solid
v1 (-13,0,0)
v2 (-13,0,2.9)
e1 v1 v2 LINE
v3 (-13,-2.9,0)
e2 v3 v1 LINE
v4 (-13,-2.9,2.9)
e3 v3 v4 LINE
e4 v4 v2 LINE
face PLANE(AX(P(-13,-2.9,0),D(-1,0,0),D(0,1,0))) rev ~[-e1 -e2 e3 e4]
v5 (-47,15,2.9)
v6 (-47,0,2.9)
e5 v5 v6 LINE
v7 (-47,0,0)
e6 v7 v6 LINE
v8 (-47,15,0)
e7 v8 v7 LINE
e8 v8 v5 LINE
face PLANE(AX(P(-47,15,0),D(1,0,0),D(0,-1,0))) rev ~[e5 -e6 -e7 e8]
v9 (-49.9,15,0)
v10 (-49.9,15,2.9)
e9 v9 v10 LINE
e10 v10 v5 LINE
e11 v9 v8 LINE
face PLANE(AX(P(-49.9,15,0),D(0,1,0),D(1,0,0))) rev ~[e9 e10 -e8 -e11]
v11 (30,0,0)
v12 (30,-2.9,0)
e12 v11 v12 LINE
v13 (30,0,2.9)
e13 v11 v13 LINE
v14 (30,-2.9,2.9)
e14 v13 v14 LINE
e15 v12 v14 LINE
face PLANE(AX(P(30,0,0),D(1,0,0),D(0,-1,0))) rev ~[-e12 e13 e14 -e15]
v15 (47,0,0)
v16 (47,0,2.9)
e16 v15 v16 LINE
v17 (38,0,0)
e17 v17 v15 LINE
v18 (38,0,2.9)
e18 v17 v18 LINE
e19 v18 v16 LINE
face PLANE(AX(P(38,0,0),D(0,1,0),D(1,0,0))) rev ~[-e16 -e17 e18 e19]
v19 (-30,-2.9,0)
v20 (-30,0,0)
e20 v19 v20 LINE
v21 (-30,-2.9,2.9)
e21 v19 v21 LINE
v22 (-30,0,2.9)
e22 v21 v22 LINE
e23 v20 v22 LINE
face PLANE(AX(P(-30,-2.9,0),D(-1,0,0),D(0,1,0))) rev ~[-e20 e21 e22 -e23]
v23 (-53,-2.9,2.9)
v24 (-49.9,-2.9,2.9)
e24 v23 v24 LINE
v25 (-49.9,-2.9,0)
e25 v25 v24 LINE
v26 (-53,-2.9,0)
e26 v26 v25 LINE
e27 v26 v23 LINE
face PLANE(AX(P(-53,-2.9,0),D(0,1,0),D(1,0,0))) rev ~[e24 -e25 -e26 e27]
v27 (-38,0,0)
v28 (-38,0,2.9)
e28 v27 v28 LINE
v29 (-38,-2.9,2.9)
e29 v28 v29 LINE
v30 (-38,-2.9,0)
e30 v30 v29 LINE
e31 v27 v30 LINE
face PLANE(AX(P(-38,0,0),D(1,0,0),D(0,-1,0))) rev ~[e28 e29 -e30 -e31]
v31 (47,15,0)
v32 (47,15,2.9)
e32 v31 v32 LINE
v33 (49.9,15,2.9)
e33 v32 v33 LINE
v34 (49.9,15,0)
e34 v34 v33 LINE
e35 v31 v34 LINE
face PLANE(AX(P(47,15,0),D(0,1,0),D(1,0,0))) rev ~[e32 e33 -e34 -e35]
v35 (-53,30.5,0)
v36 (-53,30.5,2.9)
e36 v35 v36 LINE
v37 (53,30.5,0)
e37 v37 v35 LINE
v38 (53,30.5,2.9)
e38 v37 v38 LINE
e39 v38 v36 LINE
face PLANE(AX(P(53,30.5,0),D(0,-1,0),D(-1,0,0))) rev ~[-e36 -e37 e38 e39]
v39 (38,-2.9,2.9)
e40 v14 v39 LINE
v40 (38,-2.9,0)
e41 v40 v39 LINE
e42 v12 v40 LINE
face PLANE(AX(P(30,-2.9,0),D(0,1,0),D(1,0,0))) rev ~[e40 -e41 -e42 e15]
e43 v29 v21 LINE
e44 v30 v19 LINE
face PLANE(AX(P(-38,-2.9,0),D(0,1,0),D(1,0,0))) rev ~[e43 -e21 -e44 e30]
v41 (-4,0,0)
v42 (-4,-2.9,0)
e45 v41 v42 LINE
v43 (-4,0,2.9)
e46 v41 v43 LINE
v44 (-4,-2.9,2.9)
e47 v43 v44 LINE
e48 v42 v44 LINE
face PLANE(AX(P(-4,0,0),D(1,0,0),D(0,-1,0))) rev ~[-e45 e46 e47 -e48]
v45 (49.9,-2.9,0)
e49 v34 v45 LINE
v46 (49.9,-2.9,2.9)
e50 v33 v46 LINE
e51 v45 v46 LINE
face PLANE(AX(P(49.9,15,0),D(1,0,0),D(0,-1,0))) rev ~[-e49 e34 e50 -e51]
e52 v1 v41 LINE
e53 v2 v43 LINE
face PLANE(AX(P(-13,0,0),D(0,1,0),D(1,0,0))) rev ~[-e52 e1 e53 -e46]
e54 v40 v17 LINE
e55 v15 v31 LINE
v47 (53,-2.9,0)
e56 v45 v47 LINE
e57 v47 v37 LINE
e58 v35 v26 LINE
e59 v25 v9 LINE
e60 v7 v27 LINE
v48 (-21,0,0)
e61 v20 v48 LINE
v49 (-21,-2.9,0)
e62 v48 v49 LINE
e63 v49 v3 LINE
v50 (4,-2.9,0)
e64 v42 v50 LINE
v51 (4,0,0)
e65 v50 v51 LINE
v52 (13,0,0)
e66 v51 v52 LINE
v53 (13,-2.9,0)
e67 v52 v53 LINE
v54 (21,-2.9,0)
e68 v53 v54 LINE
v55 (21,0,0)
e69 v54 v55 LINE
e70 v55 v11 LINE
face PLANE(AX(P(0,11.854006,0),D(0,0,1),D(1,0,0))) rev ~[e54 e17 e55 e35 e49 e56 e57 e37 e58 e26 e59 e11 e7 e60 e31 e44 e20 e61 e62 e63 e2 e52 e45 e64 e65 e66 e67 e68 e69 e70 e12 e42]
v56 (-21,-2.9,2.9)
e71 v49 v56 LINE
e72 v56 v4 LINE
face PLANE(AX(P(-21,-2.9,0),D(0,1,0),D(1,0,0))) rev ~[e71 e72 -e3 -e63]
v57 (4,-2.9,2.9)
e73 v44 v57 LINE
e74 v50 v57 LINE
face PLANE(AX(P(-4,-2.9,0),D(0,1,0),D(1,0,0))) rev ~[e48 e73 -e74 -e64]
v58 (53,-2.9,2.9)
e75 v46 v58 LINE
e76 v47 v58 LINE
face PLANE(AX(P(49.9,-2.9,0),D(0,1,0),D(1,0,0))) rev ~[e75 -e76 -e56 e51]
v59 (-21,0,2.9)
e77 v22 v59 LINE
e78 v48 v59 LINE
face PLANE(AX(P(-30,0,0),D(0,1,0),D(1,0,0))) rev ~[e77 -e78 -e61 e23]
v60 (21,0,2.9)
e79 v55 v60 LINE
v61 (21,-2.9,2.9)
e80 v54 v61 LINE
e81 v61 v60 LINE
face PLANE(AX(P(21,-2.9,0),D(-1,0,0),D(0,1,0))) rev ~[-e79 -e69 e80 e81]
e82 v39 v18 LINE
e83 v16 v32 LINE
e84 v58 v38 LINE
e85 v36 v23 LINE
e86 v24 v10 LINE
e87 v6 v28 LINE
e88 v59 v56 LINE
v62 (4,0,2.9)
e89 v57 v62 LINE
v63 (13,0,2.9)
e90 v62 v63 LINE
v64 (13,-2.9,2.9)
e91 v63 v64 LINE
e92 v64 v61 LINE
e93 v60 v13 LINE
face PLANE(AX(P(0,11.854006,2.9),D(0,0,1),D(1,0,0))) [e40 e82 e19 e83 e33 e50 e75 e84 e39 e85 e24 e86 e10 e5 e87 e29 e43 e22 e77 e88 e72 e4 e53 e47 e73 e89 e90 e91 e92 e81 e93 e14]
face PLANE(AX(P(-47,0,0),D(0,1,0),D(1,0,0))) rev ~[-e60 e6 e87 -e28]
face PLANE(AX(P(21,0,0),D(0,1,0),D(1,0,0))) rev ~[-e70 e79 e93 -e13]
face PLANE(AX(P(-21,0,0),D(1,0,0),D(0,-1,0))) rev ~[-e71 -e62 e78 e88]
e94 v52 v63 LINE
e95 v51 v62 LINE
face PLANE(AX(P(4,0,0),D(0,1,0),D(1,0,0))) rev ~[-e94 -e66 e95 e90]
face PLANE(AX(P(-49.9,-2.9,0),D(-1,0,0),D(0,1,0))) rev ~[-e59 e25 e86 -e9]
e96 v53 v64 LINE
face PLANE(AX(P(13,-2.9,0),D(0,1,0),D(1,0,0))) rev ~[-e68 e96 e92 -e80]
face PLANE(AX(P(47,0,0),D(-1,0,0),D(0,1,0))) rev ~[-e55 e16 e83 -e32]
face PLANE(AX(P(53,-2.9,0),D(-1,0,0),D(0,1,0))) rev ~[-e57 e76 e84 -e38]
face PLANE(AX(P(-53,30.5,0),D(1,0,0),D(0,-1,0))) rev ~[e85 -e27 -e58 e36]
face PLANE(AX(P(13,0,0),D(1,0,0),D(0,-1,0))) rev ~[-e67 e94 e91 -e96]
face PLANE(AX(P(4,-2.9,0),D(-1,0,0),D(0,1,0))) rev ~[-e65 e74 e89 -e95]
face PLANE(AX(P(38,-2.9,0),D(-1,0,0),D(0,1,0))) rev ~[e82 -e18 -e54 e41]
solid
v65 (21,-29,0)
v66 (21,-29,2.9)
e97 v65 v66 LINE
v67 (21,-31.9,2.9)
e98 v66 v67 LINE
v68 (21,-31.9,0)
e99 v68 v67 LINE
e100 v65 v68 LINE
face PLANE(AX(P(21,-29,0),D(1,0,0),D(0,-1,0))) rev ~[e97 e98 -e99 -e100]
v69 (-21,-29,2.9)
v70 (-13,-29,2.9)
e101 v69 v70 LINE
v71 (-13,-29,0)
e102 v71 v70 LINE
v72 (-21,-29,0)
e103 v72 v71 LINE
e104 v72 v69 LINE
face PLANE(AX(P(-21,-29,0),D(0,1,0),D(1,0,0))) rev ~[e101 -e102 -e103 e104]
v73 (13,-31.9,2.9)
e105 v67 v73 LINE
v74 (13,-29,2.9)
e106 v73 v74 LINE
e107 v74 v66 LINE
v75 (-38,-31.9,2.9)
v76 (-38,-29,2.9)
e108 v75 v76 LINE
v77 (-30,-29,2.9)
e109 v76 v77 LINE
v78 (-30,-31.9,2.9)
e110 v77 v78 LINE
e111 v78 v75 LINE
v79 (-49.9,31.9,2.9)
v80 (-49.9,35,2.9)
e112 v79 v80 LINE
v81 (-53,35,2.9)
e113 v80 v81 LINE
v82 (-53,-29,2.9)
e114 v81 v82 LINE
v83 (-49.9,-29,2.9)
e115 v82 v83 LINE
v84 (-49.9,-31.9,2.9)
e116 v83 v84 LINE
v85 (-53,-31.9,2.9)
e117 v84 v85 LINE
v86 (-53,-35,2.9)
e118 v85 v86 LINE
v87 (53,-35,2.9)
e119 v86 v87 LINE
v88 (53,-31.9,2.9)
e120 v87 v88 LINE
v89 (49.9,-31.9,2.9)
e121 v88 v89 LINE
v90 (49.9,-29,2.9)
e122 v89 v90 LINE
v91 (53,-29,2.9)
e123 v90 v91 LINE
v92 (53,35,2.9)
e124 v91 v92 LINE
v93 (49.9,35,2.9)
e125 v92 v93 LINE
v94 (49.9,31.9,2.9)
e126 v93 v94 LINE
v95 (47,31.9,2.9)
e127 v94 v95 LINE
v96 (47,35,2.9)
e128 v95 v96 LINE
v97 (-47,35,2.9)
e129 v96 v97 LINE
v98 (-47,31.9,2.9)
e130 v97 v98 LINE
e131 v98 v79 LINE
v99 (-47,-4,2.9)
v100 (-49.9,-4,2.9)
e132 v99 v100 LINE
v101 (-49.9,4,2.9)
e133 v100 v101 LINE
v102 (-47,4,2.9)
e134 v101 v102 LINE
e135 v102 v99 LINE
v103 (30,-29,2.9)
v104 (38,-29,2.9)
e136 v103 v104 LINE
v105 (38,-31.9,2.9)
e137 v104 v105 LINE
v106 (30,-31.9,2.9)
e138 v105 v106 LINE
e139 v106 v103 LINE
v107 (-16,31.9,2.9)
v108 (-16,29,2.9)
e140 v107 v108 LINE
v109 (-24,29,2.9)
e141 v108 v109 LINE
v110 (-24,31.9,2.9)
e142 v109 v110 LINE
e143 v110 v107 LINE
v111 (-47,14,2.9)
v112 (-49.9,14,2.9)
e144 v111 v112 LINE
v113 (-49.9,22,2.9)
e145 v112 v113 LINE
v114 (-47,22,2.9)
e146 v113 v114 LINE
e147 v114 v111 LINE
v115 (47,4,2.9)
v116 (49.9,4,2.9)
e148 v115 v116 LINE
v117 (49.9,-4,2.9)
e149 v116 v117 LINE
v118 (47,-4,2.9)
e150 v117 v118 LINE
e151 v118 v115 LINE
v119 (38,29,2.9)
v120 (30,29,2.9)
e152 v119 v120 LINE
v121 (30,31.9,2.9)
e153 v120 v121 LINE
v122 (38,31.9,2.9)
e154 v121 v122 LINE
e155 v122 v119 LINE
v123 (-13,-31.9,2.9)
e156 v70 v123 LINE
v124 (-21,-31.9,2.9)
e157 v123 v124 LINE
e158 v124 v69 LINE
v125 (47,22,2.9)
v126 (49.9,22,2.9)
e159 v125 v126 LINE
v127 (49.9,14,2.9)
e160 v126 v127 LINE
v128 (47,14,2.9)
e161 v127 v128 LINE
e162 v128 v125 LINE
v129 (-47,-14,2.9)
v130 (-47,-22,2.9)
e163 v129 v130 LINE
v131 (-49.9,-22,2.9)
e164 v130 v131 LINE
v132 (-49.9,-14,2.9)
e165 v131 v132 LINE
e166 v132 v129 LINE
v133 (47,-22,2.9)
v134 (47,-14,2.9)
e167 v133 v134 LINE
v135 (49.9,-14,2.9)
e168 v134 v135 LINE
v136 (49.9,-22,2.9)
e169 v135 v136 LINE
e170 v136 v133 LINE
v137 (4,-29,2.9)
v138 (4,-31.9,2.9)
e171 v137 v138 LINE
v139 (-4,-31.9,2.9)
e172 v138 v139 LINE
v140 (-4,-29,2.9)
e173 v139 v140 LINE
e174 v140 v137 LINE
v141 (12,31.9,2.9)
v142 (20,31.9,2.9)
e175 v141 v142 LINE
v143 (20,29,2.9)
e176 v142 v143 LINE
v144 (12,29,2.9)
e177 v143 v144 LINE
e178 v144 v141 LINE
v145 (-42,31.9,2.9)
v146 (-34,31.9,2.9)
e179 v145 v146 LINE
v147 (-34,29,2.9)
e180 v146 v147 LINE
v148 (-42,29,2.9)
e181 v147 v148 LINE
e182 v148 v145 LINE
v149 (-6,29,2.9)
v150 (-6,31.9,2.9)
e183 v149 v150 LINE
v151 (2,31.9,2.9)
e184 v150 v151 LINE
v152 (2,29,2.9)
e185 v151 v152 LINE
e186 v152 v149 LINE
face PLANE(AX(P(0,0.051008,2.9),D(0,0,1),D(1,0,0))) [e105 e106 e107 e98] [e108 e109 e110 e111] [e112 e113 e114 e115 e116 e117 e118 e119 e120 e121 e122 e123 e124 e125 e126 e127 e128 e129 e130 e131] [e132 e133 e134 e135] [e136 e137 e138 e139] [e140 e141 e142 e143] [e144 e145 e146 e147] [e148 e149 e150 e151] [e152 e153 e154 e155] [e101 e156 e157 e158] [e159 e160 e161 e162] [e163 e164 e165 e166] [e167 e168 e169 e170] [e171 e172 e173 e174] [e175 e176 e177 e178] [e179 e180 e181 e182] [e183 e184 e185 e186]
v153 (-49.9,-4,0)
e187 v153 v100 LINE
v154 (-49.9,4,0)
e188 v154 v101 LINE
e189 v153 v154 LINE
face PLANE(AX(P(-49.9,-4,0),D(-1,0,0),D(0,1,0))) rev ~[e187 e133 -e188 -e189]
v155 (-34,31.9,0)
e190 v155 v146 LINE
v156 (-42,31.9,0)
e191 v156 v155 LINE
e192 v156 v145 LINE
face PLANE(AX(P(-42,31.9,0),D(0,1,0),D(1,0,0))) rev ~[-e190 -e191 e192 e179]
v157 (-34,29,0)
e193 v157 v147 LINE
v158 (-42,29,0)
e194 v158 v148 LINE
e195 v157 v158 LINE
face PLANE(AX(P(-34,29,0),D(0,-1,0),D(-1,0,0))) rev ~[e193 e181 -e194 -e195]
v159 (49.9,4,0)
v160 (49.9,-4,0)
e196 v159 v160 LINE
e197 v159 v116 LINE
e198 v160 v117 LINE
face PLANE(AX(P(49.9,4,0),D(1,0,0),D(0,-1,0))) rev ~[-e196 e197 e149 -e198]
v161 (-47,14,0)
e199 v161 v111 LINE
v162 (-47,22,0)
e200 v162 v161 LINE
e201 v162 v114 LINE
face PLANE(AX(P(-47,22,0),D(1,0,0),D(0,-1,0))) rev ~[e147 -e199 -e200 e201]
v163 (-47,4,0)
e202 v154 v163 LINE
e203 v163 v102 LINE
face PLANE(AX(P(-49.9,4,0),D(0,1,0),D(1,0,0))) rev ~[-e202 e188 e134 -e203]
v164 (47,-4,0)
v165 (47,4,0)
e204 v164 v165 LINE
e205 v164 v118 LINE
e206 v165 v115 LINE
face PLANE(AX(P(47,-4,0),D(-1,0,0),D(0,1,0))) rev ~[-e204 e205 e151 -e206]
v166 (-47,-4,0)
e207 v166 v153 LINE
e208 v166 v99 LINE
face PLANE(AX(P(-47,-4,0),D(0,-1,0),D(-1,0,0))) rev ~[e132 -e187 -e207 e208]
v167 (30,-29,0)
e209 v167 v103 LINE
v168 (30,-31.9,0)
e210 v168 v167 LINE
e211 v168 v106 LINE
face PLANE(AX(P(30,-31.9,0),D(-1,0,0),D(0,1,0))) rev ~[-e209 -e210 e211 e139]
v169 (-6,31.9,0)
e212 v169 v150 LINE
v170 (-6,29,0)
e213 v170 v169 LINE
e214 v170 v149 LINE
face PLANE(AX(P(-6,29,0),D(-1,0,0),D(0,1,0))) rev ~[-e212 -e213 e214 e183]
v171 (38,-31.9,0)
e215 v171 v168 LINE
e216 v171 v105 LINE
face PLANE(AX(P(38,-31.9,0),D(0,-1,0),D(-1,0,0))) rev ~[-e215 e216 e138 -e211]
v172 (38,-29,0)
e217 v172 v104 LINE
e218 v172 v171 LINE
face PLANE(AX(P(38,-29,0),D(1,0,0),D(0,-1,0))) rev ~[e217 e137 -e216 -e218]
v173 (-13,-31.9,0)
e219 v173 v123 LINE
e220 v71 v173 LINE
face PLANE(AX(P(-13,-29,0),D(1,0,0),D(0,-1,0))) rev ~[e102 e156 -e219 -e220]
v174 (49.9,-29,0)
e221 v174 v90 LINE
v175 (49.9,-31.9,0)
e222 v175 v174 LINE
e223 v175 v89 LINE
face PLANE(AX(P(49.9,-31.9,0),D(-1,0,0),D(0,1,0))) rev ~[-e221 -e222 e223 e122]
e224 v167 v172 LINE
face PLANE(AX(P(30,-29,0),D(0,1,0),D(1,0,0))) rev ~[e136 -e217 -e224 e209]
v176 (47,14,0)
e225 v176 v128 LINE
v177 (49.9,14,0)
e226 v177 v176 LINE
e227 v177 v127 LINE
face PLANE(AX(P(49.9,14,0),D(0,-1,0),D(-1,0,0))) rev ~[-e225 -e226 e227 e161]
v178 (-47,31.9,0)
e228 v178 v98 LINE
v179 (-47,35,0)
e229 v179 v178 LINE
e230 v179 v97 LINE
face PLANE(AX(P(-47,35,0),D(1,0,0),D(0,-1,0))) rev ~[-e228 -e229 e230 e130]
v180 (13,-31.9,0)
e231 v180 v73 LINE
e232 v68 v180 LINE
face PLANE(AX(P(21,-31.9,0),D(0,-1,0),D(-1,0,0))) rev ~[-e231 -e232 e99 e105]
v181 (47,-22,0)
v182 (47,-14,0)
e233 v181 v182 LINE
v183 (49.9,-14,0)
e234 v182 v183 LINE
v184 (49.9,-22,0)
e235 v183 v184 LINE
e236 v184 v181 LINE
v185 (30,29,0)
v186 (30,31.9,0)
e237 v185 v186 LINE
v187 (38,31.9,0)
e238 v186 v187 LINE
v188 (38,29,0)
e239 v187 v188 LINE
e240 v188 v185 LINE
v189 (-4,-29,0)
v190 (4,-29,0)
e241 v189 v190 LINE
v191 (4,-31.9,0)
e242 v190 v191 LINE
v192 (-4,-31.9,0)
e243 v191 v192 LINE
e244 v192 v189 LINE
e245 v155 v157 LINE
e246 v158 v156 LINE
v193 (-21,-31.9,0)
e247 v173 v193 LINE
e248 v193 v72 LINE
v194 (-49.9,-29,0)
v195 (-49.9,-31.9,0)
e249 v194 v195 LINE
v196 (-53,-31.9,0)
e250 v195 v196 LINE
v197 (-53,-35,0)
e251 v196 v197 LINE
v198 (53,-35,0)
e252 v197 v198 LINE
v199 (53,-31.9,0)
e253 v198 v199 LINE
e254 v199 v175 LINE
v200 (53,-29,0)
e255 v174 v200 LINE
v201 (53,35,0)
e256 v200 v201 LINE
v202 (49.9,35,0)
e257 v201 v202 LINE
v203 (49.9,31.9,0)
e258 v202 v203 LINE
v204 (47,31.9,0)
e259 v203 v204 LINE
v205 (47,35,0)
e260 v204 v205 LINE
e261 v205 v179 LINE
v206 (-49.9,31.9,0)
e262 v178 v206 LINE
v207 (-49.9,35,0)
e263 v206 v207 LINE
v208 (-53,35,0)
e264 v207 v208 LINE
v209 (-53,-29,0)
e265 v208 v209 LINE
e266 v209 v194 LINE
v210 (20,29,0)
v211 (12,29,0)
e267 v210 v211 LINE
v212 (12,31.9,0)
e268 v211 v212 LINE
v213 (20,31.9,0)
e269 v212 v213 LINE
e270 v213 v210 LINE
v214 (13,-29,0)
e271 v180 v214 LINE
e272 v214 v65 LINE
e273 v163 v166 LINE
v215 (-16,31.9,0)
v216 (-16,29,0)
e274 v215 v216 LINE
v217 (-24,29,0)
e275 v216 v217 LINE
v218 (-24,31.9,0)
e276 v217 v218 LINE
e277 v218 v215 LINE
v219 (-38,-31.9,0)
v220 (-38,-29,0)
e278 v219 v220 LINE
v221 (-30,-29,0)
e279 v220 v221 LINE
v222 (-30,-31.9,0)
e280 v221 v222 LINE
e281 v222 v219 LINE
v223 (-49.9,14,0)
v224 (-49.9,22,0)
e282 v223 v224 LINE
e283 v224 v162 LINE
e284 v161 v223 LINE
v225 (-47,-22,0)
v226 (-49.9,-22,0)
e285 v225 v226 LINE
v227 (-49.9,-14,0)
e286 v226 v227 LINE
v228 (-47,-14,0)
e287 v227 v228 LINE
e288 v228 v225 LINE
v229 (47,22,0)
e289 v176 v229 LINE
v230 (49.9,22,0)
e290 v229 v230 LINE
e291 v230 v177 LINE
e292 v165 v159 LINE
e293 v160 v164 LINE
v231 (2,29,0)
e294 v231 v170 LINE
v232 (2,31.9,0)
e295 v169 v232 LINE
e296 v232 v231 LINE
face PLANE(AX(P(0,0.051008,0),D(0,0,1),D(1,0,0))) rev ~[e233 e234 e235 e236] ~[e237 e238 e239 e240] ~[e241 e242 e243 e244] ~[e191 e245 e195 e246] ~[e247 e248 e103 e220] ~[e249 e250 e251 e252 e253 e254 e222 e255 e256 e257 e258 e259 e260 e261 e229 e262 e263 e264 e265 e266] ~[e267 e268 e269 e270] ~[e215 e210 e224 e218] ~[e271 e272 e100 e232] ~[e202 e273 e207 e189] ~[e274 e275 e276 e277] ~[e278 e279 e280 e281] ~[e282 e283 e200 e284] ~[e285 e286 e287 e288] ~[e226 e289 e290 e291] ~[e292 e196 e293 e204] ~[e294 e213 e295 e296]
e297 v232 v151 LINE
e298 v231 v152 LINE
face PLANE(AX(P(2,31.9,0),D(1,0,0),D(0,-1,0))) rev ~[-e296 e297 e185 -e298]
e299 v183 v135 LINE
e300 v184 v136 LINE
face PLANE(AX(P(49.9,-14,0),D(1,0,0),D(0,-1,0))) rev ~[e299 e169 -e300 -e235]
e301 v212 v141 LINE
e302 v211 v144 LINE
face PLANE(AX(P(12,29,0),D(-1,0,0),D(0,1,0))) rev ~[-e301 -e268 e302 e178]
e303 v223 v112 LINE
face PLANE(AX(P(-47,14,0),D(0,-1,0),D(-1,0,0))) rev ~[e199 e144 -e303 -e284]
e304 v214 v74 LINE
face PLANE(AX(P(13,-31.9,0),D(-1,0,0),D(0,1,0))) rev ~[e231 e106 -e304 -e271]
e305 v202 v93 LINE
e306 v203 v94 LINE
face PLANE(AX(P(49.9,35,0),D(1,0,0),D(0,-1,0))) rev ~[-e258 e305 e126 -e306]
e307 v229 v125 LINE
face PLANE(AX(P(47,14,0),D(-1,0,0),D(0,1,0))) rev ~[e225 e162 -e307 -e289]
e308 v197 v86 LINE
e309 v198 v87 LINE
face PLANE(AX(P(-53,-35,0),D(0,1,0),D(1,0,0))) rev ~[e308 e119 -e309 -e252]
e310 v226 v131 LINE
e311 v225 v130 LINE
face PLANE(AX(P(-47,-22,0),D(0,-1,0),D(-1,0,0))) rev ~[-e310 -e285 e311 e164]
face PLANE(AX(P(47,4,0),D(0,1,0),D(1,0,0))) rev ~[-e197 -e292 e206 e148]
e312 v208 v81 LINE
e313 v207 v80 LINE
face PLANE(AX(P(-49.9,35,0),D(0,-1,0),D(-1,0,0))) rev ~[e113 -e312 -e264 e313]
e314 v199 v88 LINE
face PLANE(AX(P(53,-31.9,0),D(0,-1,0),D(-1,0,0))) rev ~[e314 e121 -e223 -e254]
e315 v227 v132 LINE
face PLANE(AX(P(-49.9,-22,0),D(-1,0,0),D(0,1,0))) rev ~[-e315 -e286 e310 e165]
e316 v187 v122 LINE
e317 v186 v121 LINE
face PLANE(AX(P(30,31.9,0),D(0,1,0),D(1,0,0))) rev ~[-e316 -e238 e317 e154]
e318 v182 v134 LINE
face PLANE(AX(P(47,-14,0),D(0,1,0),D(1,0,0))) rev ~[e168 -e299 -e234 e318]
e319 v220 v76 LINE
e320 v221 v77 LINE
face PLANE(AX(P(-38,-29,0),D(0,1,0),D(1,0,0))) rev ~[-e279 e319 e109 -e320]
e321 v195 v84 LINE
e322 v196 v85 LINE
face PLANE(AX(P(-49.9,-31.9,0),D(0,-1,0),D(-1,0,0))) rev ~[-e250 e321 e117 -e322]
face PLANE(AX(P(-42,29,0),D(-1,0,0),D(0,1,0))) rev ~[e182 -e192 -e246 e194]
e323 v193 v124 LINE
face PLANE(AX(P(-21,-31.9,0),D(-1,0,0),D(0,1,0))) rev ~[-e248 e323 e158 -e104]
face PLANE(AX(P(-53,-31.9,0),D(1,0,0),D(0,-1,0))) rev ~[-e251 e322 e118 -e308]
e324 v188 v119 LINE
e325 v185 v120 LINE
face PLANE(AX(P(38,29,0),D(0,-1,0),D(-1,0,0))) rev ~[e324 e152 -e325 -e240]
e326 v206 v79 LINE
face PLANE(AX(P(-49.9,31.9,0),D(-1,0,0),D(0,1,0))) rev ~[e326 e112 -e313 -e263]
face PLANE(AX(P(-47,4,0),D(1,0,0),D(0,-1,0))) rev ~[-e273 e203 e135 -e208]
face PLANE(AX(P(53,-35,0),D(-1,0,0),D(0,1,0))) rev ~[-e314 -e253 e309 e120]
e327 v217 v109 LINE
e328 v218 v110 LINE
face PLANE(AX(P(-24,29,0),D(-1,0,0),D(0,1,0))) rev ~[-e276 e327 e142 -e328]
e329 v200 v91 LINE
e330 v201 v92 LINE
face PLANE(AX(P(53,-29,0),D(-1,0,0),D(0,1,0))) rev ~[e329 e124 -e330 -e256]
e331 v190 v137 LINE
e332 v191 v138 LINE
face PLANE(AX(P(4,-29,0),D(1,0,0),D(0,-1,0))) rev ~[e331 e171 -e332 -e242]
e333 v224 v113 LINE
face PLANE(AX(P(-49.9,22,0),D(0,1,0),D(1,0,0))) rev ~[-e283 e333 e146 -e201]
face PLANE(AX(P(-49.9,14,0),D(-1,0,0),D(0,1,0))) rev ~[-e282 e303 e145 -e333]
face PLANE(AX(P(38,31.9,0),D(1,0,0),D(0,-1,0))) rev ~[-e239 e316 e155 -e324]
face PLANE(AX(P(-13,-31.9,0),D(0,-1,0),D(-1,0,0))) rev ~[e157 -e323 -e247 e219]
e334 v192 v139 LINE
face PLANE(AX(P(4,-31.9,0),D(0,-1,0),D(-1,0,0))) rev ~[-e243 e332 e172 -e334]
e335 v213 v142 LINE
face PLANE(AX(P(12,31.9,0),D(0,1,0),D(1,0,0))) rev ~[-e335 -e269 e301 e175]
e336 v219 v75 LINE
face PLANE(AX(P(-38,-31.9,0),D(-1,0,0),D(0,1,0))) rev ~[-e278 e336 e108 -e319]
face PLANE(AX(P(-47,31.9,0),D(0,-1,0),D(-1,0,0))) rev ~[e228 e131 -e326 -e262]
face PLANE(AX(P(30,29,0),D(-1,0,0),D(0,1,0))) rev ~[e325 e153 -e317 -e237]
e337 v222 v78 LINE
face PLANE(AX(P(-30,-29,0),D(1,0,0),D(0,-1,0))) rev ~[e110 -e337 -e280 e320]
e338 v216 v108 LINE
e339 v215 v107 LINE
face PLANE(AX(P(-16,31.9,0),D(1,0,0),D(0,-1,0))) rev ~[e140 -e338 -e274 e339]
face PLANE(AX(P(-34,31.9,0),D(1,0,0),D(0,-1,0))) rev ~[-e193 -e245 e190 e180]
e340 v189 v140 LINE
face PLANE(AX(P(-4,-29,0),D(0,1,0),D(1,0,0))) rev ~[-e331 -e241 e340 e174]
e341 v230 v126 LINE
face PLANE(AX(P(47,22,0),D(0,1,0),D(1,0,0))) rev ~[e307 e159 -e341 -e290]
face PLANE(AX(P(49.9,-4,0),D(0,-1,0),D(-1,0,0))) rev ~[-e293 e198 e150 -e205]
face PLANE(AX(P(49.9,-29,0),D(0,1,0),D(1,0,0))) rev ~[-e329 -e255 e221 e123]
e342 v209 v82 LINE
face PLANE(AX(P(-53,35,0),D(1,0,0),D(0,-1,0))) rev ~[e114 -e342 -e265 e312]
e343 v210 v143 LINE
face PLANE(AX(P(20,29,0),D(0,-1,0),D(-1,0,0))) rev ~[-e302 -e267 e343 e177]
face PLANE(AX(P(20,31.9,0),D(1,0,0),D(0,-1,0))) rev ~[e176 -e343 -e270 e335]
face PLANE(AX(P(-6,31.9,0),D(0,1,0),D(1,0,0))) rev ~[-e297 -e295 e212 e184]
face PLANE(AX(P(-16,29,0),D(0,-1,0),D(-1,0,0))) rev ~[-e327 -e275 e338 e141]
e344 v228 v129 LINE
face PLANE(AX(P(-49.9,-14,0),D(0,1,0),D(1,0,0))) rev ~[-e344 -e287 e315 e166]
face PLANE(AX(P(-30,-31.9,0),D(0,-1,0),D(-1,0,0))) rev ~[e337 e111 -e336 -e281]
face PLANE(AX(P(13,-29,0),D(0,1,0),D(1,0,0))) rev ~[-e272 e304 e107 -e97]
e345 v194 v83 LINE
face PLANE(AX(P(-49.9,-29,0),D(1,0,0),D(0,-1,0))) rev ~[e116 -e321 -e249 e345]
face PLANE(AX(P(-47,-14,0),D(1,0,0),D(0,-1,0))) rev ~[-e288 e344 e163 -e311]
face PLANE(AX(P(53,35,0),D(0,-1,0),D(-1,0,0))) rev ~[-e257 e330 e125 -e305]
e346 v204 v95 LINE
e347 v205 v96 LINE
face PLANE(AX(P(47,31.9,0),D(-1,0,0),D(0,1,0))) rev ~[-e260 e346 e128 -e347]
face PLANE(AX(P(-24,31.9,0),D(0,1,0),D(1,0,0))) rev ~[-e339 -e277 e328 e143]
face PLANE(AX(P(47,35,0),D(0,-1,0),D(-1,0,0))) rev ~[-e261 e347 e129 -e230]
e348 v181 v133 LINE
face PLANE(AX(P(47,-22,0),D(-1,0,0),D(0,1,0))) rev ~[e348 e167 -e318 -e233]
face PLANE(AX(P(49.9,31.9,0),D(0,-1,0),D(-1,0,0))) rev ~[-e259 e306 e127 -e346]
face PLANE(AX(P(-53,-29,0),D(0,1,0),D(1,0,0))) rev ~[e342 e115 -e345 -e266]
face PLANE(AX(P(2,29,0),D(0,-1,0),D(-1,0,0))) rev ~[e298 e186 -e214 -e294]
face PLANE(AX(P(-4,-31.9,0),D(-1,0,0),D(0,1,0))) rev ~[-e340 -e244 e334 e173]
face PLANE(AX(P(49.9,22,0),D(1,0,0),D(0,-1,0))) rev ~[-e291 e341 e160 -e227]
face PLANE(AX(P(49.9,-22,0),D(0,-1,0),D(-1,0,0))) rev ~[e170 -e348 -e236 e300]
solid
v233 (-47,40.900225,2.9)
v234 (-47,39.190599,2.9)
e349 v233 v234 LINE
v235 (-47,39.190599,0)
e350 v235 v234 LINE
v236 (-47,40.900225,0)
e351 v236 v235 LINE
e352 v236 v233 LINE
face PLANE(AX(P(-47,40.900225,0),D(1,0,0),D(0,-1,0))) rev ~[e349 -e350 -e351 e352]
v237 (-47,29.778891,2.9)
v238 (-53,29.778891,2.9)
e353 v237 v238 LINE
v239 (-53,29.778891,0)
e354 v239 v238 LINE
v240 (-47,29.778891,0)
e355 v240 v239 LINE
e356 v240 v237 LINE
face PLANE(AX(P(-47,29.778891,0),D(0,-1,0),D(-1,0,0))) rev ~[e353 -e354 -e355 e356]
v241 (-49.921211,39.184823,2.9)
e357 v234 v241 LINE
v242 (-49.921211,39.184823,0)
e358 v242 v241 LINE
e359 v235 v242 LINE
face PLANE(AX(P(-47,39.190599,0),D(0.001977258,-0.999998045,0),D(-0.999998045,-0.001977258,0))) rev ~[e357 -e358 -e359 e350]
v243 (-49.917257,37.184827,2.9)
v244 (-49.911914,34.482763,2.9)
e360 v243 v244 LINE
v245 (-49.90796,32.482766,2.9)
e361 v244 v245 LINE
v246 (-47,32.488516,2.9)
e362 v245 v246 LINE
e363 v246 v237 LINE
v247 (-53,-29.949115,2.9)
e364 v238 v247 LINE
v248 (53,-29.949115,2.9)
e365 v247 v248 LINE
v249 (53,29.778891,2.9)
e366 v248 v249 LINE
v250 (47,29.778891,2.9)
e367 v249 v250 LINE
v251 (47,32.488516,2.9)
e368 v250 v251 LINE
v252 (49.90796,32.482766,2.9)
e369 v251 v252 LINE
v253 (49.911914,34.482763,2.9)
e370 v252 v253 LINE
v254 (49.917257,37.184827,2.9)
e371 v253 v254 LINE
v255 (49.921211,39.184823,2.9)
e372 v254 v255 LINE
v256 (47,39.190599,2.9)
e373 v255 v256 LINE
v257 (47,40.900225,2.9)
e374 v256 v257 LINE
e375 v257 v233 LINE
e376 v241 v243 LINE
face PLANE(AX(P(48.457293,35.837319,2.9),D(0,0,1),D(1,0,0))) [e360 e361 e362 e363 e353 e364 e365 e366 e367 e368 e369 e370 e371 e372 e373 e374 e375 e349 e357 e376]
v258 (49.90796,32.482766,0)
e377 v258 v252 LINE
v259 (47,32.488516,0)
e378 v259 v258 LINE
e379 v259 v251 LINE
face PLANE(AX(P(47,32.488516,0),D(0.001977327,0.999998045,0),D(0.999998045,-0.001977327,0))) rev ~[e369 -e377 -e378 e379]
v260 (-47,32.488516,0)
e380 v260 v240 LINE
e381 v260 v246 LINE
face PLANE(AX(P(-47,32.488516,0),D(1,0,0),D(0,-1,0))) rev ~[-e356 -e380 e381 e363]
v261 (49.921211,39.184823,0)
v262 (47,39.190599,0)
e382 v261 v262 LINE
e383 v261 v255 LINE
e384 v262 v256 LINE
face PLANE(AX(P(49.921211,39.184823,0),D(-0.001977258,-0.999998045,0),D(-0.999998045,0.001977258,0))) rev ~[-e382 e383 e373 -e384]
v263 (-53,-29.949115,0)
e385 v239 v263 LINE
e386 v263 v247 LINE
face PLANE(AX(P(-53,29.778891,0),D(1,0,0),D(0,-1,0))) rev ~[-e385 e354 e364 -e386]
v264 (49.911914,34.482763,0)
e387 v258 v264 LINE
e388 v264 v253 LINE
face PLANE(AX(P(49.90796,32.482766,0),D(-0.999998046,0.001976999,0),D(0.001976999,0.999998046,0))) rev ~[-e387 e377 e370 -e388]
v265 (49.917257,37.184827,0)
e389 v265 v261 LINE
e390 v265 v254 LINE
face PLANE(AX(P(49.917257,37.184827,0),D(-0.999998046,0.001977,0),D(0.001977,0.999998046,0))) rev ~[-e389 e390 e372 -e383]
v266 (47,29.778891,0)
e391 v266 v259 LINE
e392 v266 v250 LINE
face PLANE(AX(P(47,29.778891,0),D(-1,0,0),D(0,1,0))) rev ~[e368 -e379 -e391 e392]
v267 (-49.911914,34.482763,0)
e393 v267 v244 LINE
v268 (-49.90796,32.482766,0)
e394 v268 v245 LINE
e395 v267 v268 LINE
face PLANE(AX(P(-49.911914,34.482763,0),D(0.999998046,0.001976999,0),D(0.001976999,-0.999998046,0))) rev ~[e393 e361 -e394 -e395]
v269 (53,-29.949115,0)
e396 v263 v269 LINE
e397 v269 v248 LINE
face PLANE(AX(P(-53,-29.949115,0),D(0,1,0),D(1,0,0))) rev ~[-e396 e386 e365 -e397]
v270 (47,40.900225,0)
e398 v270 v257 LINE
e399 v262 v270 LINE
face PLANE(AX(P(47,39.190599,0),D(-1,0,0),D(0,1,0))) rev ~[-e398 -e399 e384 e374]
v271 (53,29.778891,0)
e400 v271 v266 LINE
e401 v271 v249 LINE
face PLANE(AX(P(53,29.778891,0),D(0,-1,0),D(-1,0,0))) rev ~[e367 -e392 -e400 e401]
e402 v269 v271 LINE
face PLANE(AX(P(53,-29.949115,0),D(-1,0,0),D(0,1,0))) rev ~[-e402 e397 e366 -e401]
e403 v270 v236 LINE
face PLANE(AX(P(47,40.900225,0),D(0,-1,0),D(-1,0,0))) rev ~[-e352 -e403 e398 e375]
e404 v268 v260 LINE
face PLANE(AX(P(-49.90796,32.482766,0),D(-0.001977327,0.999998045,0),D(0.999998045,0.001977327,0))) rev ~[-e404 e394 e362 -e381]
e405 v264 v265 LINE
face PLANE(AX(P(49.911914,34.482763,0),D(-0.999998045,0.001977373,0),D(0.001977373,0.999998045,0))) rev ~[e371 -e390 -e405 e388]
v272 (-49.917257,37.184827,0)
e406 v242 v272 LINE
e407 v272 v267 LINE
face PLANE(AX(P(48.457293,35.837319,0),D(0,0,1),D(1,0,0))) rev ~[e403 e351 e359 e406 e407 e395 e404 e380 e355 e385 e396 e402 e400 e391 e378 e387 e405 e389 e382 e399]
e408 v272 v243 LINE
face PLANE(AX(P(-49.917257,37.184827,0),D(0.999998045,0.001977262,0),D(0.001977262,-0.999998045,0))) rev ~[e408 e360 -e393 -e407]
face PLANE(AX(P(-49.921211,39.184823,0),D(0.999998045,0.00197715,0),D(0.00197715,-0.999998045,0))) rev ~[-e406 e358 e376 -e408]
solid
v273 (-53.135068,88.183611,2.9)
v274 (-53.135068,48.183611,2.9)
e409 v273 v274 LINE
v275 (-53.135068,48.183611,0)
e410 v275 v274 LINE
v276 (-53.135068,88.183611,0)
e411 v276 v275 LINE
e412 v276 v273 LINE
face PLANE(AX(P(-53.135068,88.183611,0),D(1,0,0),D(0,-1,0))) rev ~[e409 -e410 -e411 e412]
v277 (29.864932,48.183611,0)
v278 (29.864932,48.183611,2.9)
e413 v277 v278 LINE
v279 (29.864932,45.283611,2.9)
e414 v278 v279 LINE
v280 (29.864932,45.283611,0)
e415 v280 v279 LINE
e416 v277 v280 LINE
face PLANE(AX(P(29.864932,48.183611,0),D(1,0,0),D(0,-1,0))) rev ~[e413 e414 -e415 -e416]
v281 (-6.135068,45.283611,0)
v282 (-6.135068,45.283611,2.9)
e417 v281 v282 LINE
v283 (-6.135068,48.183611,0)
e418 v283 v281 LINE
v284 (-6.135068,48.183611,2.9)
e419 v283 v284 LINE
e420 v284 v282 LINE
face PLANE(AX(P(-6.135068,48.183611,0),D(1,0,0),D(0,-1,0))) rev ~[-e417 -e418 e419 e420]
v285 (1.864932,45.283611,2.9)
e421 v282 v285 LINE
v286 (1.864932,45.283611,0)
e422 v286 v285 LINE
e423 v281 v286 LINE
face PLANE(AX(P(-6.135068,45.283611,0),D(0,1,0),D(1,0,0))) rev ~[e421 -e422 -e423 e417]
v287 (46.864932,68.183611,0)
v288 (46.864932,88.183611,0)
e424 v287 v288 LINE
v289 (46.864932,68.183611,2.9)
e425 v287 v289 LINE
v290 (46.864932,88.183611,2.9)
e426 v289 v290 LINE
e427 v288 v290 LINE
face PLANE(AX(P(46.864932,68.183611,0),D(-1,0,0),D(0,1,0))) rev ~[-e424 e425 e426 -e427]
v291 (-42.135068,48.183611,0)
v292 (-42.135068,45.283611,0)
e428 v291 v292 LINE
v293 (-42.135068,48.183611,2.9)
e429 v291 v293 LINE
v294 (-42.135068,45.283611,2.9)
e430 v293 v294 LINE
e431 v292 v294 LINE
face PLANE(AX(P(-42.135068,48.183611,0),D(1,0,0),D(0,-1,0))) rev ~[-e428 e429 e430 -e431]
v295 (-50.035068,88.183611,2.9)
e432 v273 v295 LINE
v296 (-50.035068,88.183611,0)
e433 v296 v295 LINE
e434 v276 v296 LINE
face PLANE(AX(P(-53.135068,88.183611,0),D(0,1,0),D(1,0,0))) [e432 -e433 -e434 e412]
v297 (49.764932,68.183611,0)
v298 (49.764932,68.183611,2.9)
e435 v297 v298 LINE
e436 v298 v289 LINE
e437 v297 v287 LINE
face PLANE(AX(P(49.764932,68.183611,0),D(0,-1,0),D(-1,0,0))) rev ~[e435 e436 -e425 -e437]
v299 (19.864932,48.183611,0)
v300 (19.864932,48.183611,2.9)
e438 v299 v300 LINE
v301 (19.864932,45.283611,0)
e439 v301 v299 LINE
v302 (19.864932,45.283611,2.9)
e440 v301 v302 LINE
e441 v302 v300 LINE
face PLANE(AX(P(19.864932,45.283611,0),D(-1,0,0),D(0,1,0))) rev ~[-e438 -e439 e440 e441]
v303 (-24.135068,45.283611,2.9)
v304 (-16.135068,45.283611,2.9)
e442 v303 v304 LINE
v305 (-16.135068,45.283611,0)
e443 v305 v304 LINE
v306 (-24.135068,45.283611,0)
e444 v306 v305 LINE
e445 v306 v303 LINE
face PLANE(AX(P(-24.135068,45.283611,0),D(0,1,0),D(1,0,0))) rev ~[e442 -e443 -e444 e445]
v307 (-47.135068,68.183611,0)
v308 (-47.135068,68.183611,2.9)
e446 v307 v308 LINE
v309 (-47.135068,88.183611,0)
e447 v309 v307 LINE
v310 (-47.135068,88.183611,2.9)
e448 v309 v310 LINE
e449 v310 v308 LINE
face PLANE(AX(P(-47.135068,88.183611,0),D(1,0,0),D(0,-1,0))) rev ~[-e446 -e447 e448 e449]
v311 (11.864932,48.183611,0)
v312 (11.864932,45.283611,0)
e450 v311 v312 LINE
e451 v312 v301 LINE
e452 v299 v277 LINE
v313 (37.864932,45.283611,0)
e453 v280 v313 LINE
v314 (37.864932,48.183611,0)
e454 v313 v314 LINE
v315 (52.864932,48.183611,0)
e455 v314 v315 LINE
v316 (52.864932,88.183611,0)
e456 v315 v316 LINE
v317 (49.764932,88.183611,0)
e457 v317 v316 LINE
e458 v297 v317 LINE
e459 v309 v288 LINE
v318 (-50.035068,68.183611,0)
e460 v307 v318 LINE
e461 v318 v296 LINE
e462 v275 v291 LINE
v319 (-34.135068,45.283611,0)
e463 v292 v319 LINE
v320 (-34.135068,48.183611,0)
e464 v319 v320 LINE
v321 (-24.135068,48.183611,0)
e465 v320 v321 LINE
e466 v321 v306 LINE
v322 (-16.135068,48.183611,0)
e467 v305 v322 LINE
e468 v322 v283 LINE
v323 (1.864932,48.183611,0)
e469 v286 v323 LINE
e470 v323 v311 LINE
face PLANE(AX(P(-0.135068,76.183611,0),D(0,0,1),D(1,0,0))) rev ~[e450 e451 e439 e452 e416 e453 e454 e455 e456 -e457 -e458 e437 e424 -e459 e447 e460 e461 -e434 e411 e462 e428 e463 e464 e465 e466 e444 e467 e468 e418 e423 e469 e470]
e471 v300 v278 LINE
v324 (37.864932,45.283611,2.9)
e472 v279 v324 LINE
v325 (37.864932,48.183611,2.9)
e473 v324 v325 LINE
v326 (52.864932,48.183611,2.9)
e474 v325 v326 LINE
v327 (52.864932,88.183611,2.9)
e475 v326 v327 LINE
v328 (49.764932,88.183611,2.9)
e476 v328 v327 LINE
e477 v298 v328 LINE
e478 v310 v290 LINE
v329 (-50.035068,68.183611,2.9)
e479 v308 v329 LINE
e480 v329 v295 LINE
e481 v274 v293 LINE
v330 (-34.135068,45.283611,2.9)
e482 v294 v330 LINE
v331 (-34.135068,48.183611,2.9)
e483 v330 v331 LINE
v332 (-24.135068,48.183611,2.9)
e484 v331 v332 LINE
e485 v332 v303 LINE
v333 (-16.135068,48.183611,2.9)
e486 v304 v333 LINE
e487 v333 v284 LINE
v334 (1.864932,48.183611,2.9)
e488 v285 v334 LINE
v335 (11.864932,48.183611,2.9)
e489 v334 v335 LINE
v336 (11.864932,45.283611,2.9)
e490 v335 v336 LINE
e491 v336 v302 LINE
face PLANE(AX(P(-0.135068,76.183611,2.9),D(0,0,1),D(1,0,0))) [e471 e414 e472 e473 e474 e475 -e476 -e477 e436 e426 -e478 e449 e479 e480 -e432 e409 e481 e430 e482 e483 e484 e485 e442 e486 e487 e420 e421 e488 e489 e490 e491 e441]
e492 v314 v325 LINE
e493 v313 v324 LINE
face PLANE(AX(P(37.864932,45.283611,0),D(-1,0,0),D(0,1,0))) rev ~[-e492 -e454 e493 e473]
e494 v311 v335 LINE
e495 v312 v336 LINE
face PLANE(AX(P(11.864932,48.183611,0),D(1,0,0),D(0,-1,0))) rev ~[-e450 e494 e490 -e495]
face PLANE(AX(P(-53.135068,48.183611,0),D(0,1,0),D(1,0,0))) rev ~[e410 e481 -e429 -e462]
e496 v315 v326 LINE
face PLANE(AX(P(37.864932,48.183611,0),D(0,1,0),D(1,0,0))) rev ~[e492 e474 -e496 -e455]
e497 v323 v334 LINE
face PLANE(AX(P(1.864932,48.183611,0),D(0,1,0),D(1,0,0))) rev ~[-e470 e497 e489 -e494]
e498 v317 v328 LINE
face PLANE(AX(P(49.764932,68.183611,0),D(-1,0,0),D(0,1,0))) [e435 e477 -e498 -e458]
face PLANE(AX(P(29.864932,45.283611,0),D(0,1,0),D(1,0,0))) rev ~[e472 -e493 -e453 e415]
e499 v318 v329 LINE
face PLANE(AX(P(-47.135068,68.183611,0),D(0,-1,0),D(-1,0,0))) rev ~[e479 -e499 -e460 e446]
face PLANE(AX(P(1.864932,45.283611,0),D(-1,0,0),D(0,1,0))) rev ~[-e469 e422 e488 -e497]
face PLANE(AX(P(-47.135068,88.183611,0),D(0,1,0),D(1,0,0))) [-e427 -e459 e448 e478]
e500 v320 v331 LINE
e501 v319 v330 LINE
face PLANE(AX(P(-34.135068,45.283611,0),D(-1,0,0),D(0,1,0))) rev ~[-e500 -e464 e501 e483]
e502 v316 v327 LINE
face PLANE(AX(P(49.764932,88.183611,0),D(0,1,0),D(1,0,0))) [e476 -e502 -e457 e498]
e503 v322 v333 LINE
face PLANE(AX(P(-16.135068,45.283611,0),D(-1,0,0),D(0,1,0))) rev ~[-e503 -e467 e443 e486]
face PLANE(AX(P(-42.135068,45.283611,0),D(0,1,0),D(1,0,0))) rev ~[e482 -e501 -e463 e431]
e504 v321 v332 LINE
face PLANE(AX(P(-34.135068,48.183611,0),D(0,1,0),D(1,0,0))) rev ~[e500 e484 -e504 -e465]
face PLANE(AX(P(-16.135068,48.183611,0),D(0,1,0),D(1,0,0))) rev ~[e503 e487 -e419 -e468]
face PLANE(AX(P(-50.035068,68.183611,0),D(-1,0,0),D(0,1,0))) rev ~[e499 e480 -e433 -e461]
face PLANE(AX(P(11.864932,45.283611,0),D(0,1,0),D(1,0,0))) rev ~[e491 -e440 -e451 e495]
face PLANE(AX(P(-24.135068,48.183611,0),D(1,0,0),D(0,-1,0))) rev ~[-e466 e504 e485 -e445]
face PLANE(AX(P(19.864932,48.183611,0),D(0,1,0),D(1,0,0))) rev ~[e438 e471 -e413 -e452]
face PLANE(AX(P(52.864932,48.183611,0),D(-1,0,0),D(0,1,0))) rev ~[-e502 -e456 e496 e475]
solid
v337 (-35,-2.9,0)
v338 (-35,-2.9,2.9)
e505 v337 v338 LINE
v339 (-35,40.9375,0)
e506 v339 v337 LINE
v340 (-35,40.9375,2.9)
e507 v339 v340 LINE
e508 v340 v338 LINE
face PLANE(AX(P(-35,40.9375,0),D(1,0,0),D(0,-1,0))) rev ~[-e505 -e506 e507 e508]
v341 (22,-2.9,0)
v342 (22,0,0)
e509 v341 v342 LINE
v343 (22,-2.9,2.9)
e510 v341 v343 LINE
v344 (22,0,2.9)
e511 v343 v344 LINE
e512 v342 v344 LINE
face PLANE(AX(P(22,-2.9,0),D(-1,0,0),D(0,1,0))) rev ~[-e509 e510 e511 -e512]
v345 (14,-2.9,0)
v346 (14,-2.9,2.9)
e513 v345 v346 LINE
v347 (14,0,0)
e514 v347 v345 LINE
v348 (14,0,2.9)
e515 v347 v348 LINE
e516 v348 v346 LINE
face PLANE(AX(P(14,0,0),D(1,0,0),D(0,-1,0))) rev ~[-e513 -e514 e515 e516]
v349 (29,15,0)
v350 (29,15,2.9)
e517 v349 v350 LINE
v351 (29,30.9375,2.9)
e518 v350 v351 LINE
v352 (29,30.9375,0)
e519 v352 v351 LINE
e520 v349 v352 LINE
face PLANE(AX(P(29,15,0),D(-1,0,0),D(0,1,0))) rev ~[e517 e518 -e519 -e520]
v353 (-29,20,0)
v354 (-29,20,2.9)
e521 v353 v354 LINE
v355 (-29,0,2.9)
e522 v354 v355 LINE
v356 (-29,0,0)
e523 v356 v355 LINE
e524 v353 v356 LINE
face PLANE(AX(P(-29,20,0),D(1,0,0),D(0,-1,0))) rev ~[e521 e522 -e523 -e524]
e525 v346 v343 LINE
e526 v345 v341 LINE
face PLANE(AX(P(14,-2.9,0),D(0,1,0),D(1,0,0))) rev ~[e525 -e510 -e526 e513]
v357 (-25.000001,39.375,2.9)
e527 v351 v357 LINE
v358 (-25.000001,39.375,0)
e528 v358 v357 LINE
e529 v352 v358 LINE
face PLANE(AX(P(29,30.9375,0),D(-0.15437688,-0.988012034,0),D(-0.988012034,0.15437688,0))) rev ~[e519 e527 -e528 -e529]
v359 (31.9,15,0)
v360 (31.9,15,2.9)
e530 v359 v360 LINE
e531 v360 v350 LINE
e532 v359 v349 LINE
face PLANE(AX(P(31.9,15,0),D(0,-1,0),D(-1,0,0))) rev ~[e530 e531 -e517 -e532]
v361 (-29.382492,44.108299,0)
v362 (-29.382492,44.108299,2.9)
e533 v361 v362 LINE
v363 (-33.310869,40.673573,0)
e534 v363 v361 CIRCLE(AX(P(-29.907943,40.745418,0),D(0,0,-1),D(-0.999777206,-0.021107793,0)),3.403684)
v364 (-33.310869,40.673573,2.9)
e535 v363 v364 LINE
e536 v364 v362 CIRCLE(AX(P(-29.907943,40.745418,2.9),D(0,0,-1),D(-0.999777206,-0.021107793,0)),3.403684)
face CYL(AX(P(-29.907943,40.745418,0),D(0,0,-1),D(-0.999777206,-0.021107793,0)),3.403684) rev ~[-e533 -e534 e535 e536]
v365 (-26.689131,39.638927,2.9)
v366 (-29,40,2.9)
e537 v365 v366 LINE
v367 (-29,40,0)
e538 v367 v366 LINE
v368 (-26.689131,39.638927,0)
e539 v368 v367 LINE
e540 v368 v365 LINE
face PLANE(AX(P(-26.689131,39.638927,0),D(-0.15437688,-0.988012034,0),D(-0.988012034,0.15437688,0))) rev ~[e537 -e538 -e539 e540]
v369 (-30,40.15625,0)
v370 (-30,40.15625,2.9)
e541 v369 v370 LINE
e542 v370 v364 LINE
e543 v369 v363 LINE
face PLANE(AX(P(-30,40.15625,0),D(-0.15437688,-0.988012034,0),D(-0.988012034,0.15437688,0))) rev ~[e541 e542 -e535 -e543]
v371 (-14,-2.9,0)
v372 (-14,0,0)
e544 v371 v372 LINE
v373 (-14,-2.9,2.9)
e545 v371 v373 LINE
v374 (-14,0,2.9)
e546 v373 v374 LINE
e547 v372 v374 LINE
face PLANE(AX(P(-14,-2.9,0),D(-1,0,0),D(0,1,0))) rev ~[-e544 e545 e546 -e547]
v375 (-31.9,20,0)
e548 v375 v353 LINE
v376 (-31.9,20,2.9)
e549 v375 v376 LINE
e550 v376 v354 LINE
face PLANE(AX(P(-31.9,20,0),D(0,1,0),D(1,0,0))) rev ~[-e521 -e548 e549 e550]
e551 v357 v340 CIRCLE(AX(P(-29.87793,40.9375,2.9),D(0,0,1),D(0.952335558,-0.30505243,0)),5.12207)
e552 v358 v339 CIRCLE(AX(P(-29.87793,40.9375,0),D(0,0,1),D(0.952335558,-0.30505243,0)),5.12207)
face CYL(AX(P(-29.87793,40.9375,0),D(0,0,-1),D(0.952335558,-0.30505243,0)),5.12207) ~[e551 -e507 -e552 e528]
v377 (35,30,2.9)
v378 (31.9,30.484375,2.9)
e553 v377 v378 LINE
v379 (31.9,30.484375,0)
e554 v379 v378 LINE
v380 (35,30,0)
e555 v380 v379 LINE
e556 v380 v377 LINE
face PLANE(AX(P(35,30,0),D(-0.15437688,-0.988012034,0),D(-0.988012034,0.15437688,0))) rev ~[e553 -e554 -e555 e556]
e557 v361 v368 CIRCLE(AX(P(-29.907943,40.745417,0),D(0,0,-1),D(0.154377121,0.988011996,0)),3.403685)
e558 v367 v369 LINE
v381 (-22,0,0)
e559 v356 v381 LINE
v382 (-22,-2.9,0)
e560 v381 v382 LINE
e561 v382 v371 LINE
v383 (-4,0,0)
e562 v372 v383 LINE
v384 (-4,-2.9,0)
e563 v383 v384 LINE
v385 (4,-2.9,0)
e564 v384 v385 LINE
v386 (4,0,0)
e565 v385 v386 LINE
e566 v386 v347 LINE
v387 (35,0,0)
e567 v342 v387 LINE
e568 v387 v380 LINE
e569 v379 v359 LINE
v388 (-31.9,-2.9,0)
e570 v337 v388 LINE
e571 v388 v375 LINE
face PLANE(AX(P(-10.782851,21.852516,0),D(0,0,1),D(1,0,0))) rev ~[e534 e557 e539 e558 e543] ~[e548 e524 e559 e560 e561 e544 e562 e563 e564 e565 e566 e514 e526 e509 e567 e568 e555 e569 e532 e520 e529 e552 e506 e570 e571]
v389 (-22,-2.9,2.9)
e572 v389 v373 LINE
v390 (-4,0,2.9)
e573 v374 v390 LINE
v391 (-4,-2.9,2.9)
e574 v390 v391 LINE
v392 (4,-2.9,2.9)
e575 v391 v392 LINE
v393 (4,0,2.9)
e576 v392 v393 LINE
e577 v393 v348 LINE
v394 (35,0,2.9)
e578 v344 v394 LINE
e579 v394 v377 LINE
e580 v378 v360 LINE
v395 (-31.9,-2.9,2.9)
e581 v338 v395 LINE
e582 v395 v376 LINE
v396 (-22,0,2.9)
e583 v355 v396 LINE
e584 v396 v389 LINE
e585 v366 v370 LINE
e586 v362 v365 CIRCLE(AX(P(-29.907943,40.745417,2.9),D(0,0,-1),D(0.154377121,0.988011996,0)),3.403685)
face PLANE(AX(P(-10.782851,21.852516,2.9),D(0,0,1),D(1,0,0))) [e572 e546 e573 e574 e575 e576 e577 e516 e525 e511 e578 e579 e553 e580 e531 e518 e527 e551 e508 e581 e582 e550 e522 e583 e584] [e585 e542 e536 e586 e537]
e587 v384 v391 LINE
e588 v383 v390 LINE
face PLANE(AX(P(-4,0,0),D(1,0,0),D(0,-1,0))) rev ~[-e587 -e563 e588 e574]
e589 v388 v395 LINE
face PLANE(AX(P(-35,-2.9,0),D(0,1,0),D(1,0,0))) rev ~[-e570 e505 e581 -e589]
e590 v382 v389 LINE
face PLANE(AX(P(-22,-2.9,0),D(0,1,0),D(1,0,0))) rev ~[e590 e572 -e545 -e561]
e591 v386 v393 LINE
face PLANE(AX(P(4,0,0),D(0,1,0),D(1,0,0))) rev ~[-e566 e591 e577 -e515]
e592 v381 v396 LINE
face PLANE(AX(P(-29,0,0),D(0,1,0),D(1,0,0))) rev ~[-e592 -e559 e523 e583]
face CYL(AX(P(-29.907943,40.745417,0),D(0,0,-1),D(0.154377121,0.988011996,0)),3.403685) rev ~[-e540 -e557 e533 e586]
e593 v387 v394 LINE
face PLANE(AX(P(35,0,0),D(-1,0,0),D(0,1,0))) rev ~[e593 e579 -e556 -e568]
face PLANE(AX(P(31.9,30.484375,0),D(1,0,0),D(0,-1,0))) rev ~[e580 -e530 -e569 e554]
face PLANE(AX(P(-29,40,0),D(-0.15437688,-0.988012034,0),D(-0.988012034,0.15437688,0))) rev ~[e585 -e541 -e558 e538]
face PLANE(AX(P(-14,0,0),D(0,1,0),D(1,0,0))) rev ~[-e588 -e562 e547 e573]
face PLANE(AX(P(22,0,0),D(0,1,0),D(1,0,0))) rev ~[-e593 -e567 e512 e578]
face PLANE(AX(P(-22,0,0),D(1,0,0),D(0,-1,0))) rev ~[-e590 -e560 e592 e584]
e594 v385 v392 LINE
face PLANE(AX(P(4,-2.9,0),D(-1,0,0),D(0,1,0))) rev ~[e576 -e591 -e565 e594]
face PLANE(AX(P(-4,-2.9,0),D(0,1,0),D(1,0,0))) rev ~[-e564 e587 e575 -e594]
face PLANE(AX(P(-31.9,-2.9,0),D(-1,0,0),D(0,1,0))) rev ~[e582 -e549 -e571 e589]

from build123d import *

# Parameters (mm, degrees)
F2_DEPTH  = 2.9
F3_W      = 94
F3_H      = 16
F3_H_2    = 4
F3_W_2    = 3.1
F3_H_3    = 20
F4_DEPTH  = 2.9
F6_DEPTH  = 2.9
F8_DEPTH  = 2.9
F9_W      = 94
F9_H      = 1
F10_DEPTH = 2.9


# Not quite as in the source:
# - ends of sketch curves that miss each other by under 0.0002 mm in the source are joined


with BuildPart() as f2:
    # F1 (on Top) → F2 (new body)
    with BuildSketch(Plane.XY):
        Polygon((-53, -31.9), (-53, -35), (53, -35), (53, -31.9), (49.9, -31.9), (49.9, -29), (53, -29), (53, 35), (49.9, 35), (49.9, 31.9), (47, 31.9), (47, 35), (-47, 35), (-47, 31.9), (-49.9, 31.9), (-49.9, 35), (-53, 35), (-53, -29), (-49.9, -29), (-49.9, -31.9), align=None)
        Polygon((38, 29), (47, 29), (47, 22), (49.9, 22), (49.9, 14), (47, 14), (47, 4), (49.9, 4), (49.9, -4), (47, -4), (47, -14), (49.9, -14), (49.9, -22), (47, -22), (47, -29), (38, -29), (38, -31.9), (30, -31.9), (30, -29), (21, -29), (21, -31.9), (13, -31.9), (13, -29), (4, -29), (4, -31.9), (-4, -31.9), (-4, -29), (-13, -29), (-13, -31.9), (-21, -31.9), (-21, -29), (-30, -29), (-30, -31.9), (-38, -31.9), (-38, -29), (-47, -29), (-47, -22), (-49.9, -22), (-49.9, -14), (-47, -14), (-47, -4), (-49.9, -4), (-49.9, 4), (-47, 4), (-47, 14), (-49.9, 14), (-49.9, 22), (-47, 22), (-47, 29), (-42, 29), (-42, 31.9), (-34, 31.9), (-34, 29), (-24, 29), (-24, 31.9), (-16, 31.9), (-16, 29), (-6, 29), (-6, 31.9), (2, 31.9), (2, 29), (12, 29), (12, 31.9), (20, 31.9), (20, 29), (30, 29), (30, 31.9), (38, 31.9), align=None, mode=Mode.SUBTRACT)
        Polygon((47, -29), (0, 0), (-47, -29), (-38, -29), (-30, -29), (-21, -29), (-13, -29), (-4, -29), (4, -29), (13, -29), (21, -29), (30, -29), (38, -29), align=None)
        Polygon((-47, -29), (0, 0), (-47, 29), (-47, 22), (-47, 14), (-47, 4), (-47, -4), (-47, -14), (-47, -22), align=None)
        Polygon((0, 0), (47, 29), (38, 29), (30, 29), (20, 29), (12, 29), (2, 29), (-6, 29), (-16, 29), (-24, 29), (-34, 29), (-42, 29), (-47, 29), align=None)
        Polygon((47, 22), (47, 29), (0, 0), (47, -29), (47, -22), (47, -14), (47, -4), (47, 4), (47, 14), align=None)
    extrude(amount=F2_DEPTH)


with BuildPart() as f4:
    # F3 (on Top) → F4 (new body)
    with BuildSketch(Plane.XY):
        with Locations((-0.1350676175, 76.1836106628)):
            Rectangle(F3_W, F3_H)
        with Locations((-0.1350676175, 86.1836106628)):
            Rectangle(F3_W, F3_H_2)
        with Locations((-51.5850676175, 78.1836106628)):
            Rectangle(F3_W_2, F3_H_3)
        Polygon((37.8649323825, 48.1836106628), (52.8649323825, 48.1836106628), (52.8649323825, 68.1836106628), (49.7649323825, 68.1836106628), (46.8649323825, 68.1836106628), (-47.1350676175, 68.1836106628), (-50.0350676175, 68.1836106628), (-53.1350676175, 68.1836106628), (-53.1350676175, 48.1836106628), (-42.1350676175, 48.1836106628), (-42.1350676175, 45.2836106628), (-34.1350676175, 45.2836106628), (-34.1350676175, 48.1836106628), (-24.1350676175, 48.1836106628), (-24.1350676175, 45.2836106628), (-16.1350676175, 45.2836106628), (-16.1350676175, 48.1836106628), (-6.1350676175, 48.1836106628), (-6.1350676175, 45.2836106628), (1.8649323825, 45.2836106628), (1.8649323825, 48.1836106628), (11.8649323825, 48.1836106628), (11.8649323825, 45.2836106628), (19.8649323825, 45.2836106628), (19.8649323825, 48.1836106628), (29.8649323825, 48.1836106628), (29.8649323825, 45.2836106628), (37.8649323825, 45.2836106628), align=None)
        with Locations((51.3149323825, 78.1836106628)):
            Rectangle(F3_W_2, F3_H_3)
    extrude(amount=F4_DEPTH)


with BuildPart() as f6:
    # F5 (on Top) → F6 (new body)
    with BuildSketch(Plane.XY):
        Polygon((-29, 20), (-29, 15), (29, 15), (29, 30.9375), (-25.0000005956, 39.3750000931), (-26.689130988, 39.6389267169), (-29, 40), (-30, 40.15625), (-33.3108692899, 40.6735733265), (-35, 40.9375), (-35, -2.9), (-31.9, -2.9), (-31.9, 20), align=None)
        Polygon((-29, 0), (-22, 0), (-22, -2.9), (-14, -2.9), (-14, 0), (-4, 0), (-4, -2.9), (4, -2.9), (4, 0), (14, 0), (14, -2.9), (22, -2.9), (22, 0), (35, 0), (35, 15), (31.9, 15), (29, 15), (-29, 15), align=None)
        Polygon((31.9, 30.484375), (31.9, 15), (35, 15), (35, 30), align=None)
        with BuildLine():
            Line((-26.689130988, 39.6389267169), (-25.0000005956, 39.3750000931))
            ThreePointArc((-25.0000005956, 39.3750000931), (-29.0872008599, 45.9981668051), (-35, 40.9375))
            Line((-35, 40.9375), (-33.3108692899, 40.6735733265))
            ThreePointArc((-33.3108692899, 40.6735733265), (-32.1483227603, 43.3077928719), (-29.3824919046, 44.1082986104))
            ThreePointArc((-29.3824919046, 44.1082986104), (-26.9926904447, 42.5022249342), (-26.689130988, 39.6389267169))
        make_face()
    extrude(amount=F6_DEPTH)


with BuildPart() as f8:
    # F7 (on Top) → F8 (new body)
    with BuildSketch(Plane.XY):
        with BuildLine():
            Line((-47, 0), (-38, 0))
            Line((-38, 0), (-38, -2.9))
            Line((-38, -2.9), (-30, -2.9))
            Line((-30, -2.9), (-30, 0))
            Line((-30, 0), (-21, 0))
            Line((-21, 0), (-21, -2.9))
            Line((-21, -2.9), (-13, -2.9))
            Line((-13, -2.9), (-13, 0))
            Line((-13, 0), (-4, 0))
            Line((-4, 0), (-4, -2.9))
            Line((-4, -2.9), (4, -2.9))
            Line((4, -2.9), (4, 0))
            Line((4, 0), (13, 0))
            Line((13, 0), (13, -2.9))
            Line((13, -2.9), (21, -2.9))
            Line((21, -2.9), (21, 0))
            Line((21, 0), (30, 0))
            Line((30, 0), (30, -2.9))
            Line((30, -2.9), (38, -2.9))
            Line((38, -2.9), (38, 0))
            Line((38, 0), (47, 0))
            Line((47, 0), (47, 15))
            Line((47, 15), (49.9, 15))
            Line((49.9, 15), (49.9, -2.9))
            Line((49.9, -2.9), (53, -2.9))
            Line((53, -2.9), (53, 30.5))
            Line((53, 30.5), (9, 30.5))
            Line((9, 30.5), (9, 11))
            ThreePointArc((9, 11), (7.8284271247, 8.1715728753), (5, 7))
            Line((5, 7), (0, 7))
            Line((0, 7), (-5, 7))
            ThreePointArc((-5, 7), (-7.8284271247, 8.1715728753), (-9, 11))
            Line((-9, 11), (-9, 30.5))
            Line((-9, 30.5), (-53, 30.5))
            Line((-53, 30.5), (-53, -2.9))
            Line((-53, -2.9), (-49.9, -2.9))
            Line((-49.9, -2.9), (-49.9, 15))
            Line((-49.9, 15), (-47, 15))
            Line((-47, 15), (-47, 0))
        make_face()
        with BuildLine():
            Line((0, 30.5), (-9, 30.5))
            Line((-9, 30.5), (-9, 11))
            ThreePointArc((-9, 11), (-7.8284271247, 8.1715728753), (-5, 7))
            Line((-5, 7), (0, 7))
            Line((0, 7), (0, 30.5))
        make_face()
        with BuildLine():
            Line((9, 30.5), (0, 30.5))
            Line((0, 30.5), (0, 7))
            Line((0, 7), (5, 7))
            ThreePointArc((5, 7), (7.8284271247, 8.1715728753), (9, 11))
            Line((9, 11), (9, 30.5))
        make_face()
    extrude(amount=F8_DEPTH)


with BuildPart() as f10:
    # F9 (on Top) → F10 (new body)
    with BuildSketch(Plane.XY):
        Polygon((49.917257, 37.184827), (47, 37.190595), (47, 34.48852), (49.911914, 34.482763), align=None)
        Polygon((-47, 37.190595), (-47, 39.190599), (-49.921211, 39.184823), (-49.9172566996, 37.1848270006), align=None)
        Polygon((47, 39.190599), (47, 40.900225), (-47, 40.900225), (-47, 39.190599), (-47, 37.190595), (-47, 34.48852), (-47, 32.488516), (-47, 30.778891), (47, 30.778891), (47, 32.488516), (47, 34.48852), (47, 37.190595), align=None)
        Polygon((53, 29.778891), (47, 29.778891), (-47, 29.778891), (-53, 29.778891), (-53, -29.949115), (53, -29.949115), align=None)
        with Locations((0, 30.278891)):
            Rectangle(F9_W, F9_H)
        Polygon((-47, 34.48852), (-47, 37.190595), (-49.917257, 37.184827), (-49.9119143024, 34.4827629994), align=None)
        Polygon((49.921211, 39.184823), (47, 39.190599), (47, 37.190595), (49.917257, 37.184827), align=None)
        Polygon((-47, 32.488516), (-47, 34.48852), (-49.911914, 34.482763), (-49.90796, 32.482766), align=None)
        Polygon((49.911914, 34.482763), (47, 34.48852), (47, 32.488516), (49.90796, 32.482766), align=None)
    extrude(amount=F10_DEPTH)


solid = Compound([f2.part, f4.part, f6.part, f8.part, f10.part])
